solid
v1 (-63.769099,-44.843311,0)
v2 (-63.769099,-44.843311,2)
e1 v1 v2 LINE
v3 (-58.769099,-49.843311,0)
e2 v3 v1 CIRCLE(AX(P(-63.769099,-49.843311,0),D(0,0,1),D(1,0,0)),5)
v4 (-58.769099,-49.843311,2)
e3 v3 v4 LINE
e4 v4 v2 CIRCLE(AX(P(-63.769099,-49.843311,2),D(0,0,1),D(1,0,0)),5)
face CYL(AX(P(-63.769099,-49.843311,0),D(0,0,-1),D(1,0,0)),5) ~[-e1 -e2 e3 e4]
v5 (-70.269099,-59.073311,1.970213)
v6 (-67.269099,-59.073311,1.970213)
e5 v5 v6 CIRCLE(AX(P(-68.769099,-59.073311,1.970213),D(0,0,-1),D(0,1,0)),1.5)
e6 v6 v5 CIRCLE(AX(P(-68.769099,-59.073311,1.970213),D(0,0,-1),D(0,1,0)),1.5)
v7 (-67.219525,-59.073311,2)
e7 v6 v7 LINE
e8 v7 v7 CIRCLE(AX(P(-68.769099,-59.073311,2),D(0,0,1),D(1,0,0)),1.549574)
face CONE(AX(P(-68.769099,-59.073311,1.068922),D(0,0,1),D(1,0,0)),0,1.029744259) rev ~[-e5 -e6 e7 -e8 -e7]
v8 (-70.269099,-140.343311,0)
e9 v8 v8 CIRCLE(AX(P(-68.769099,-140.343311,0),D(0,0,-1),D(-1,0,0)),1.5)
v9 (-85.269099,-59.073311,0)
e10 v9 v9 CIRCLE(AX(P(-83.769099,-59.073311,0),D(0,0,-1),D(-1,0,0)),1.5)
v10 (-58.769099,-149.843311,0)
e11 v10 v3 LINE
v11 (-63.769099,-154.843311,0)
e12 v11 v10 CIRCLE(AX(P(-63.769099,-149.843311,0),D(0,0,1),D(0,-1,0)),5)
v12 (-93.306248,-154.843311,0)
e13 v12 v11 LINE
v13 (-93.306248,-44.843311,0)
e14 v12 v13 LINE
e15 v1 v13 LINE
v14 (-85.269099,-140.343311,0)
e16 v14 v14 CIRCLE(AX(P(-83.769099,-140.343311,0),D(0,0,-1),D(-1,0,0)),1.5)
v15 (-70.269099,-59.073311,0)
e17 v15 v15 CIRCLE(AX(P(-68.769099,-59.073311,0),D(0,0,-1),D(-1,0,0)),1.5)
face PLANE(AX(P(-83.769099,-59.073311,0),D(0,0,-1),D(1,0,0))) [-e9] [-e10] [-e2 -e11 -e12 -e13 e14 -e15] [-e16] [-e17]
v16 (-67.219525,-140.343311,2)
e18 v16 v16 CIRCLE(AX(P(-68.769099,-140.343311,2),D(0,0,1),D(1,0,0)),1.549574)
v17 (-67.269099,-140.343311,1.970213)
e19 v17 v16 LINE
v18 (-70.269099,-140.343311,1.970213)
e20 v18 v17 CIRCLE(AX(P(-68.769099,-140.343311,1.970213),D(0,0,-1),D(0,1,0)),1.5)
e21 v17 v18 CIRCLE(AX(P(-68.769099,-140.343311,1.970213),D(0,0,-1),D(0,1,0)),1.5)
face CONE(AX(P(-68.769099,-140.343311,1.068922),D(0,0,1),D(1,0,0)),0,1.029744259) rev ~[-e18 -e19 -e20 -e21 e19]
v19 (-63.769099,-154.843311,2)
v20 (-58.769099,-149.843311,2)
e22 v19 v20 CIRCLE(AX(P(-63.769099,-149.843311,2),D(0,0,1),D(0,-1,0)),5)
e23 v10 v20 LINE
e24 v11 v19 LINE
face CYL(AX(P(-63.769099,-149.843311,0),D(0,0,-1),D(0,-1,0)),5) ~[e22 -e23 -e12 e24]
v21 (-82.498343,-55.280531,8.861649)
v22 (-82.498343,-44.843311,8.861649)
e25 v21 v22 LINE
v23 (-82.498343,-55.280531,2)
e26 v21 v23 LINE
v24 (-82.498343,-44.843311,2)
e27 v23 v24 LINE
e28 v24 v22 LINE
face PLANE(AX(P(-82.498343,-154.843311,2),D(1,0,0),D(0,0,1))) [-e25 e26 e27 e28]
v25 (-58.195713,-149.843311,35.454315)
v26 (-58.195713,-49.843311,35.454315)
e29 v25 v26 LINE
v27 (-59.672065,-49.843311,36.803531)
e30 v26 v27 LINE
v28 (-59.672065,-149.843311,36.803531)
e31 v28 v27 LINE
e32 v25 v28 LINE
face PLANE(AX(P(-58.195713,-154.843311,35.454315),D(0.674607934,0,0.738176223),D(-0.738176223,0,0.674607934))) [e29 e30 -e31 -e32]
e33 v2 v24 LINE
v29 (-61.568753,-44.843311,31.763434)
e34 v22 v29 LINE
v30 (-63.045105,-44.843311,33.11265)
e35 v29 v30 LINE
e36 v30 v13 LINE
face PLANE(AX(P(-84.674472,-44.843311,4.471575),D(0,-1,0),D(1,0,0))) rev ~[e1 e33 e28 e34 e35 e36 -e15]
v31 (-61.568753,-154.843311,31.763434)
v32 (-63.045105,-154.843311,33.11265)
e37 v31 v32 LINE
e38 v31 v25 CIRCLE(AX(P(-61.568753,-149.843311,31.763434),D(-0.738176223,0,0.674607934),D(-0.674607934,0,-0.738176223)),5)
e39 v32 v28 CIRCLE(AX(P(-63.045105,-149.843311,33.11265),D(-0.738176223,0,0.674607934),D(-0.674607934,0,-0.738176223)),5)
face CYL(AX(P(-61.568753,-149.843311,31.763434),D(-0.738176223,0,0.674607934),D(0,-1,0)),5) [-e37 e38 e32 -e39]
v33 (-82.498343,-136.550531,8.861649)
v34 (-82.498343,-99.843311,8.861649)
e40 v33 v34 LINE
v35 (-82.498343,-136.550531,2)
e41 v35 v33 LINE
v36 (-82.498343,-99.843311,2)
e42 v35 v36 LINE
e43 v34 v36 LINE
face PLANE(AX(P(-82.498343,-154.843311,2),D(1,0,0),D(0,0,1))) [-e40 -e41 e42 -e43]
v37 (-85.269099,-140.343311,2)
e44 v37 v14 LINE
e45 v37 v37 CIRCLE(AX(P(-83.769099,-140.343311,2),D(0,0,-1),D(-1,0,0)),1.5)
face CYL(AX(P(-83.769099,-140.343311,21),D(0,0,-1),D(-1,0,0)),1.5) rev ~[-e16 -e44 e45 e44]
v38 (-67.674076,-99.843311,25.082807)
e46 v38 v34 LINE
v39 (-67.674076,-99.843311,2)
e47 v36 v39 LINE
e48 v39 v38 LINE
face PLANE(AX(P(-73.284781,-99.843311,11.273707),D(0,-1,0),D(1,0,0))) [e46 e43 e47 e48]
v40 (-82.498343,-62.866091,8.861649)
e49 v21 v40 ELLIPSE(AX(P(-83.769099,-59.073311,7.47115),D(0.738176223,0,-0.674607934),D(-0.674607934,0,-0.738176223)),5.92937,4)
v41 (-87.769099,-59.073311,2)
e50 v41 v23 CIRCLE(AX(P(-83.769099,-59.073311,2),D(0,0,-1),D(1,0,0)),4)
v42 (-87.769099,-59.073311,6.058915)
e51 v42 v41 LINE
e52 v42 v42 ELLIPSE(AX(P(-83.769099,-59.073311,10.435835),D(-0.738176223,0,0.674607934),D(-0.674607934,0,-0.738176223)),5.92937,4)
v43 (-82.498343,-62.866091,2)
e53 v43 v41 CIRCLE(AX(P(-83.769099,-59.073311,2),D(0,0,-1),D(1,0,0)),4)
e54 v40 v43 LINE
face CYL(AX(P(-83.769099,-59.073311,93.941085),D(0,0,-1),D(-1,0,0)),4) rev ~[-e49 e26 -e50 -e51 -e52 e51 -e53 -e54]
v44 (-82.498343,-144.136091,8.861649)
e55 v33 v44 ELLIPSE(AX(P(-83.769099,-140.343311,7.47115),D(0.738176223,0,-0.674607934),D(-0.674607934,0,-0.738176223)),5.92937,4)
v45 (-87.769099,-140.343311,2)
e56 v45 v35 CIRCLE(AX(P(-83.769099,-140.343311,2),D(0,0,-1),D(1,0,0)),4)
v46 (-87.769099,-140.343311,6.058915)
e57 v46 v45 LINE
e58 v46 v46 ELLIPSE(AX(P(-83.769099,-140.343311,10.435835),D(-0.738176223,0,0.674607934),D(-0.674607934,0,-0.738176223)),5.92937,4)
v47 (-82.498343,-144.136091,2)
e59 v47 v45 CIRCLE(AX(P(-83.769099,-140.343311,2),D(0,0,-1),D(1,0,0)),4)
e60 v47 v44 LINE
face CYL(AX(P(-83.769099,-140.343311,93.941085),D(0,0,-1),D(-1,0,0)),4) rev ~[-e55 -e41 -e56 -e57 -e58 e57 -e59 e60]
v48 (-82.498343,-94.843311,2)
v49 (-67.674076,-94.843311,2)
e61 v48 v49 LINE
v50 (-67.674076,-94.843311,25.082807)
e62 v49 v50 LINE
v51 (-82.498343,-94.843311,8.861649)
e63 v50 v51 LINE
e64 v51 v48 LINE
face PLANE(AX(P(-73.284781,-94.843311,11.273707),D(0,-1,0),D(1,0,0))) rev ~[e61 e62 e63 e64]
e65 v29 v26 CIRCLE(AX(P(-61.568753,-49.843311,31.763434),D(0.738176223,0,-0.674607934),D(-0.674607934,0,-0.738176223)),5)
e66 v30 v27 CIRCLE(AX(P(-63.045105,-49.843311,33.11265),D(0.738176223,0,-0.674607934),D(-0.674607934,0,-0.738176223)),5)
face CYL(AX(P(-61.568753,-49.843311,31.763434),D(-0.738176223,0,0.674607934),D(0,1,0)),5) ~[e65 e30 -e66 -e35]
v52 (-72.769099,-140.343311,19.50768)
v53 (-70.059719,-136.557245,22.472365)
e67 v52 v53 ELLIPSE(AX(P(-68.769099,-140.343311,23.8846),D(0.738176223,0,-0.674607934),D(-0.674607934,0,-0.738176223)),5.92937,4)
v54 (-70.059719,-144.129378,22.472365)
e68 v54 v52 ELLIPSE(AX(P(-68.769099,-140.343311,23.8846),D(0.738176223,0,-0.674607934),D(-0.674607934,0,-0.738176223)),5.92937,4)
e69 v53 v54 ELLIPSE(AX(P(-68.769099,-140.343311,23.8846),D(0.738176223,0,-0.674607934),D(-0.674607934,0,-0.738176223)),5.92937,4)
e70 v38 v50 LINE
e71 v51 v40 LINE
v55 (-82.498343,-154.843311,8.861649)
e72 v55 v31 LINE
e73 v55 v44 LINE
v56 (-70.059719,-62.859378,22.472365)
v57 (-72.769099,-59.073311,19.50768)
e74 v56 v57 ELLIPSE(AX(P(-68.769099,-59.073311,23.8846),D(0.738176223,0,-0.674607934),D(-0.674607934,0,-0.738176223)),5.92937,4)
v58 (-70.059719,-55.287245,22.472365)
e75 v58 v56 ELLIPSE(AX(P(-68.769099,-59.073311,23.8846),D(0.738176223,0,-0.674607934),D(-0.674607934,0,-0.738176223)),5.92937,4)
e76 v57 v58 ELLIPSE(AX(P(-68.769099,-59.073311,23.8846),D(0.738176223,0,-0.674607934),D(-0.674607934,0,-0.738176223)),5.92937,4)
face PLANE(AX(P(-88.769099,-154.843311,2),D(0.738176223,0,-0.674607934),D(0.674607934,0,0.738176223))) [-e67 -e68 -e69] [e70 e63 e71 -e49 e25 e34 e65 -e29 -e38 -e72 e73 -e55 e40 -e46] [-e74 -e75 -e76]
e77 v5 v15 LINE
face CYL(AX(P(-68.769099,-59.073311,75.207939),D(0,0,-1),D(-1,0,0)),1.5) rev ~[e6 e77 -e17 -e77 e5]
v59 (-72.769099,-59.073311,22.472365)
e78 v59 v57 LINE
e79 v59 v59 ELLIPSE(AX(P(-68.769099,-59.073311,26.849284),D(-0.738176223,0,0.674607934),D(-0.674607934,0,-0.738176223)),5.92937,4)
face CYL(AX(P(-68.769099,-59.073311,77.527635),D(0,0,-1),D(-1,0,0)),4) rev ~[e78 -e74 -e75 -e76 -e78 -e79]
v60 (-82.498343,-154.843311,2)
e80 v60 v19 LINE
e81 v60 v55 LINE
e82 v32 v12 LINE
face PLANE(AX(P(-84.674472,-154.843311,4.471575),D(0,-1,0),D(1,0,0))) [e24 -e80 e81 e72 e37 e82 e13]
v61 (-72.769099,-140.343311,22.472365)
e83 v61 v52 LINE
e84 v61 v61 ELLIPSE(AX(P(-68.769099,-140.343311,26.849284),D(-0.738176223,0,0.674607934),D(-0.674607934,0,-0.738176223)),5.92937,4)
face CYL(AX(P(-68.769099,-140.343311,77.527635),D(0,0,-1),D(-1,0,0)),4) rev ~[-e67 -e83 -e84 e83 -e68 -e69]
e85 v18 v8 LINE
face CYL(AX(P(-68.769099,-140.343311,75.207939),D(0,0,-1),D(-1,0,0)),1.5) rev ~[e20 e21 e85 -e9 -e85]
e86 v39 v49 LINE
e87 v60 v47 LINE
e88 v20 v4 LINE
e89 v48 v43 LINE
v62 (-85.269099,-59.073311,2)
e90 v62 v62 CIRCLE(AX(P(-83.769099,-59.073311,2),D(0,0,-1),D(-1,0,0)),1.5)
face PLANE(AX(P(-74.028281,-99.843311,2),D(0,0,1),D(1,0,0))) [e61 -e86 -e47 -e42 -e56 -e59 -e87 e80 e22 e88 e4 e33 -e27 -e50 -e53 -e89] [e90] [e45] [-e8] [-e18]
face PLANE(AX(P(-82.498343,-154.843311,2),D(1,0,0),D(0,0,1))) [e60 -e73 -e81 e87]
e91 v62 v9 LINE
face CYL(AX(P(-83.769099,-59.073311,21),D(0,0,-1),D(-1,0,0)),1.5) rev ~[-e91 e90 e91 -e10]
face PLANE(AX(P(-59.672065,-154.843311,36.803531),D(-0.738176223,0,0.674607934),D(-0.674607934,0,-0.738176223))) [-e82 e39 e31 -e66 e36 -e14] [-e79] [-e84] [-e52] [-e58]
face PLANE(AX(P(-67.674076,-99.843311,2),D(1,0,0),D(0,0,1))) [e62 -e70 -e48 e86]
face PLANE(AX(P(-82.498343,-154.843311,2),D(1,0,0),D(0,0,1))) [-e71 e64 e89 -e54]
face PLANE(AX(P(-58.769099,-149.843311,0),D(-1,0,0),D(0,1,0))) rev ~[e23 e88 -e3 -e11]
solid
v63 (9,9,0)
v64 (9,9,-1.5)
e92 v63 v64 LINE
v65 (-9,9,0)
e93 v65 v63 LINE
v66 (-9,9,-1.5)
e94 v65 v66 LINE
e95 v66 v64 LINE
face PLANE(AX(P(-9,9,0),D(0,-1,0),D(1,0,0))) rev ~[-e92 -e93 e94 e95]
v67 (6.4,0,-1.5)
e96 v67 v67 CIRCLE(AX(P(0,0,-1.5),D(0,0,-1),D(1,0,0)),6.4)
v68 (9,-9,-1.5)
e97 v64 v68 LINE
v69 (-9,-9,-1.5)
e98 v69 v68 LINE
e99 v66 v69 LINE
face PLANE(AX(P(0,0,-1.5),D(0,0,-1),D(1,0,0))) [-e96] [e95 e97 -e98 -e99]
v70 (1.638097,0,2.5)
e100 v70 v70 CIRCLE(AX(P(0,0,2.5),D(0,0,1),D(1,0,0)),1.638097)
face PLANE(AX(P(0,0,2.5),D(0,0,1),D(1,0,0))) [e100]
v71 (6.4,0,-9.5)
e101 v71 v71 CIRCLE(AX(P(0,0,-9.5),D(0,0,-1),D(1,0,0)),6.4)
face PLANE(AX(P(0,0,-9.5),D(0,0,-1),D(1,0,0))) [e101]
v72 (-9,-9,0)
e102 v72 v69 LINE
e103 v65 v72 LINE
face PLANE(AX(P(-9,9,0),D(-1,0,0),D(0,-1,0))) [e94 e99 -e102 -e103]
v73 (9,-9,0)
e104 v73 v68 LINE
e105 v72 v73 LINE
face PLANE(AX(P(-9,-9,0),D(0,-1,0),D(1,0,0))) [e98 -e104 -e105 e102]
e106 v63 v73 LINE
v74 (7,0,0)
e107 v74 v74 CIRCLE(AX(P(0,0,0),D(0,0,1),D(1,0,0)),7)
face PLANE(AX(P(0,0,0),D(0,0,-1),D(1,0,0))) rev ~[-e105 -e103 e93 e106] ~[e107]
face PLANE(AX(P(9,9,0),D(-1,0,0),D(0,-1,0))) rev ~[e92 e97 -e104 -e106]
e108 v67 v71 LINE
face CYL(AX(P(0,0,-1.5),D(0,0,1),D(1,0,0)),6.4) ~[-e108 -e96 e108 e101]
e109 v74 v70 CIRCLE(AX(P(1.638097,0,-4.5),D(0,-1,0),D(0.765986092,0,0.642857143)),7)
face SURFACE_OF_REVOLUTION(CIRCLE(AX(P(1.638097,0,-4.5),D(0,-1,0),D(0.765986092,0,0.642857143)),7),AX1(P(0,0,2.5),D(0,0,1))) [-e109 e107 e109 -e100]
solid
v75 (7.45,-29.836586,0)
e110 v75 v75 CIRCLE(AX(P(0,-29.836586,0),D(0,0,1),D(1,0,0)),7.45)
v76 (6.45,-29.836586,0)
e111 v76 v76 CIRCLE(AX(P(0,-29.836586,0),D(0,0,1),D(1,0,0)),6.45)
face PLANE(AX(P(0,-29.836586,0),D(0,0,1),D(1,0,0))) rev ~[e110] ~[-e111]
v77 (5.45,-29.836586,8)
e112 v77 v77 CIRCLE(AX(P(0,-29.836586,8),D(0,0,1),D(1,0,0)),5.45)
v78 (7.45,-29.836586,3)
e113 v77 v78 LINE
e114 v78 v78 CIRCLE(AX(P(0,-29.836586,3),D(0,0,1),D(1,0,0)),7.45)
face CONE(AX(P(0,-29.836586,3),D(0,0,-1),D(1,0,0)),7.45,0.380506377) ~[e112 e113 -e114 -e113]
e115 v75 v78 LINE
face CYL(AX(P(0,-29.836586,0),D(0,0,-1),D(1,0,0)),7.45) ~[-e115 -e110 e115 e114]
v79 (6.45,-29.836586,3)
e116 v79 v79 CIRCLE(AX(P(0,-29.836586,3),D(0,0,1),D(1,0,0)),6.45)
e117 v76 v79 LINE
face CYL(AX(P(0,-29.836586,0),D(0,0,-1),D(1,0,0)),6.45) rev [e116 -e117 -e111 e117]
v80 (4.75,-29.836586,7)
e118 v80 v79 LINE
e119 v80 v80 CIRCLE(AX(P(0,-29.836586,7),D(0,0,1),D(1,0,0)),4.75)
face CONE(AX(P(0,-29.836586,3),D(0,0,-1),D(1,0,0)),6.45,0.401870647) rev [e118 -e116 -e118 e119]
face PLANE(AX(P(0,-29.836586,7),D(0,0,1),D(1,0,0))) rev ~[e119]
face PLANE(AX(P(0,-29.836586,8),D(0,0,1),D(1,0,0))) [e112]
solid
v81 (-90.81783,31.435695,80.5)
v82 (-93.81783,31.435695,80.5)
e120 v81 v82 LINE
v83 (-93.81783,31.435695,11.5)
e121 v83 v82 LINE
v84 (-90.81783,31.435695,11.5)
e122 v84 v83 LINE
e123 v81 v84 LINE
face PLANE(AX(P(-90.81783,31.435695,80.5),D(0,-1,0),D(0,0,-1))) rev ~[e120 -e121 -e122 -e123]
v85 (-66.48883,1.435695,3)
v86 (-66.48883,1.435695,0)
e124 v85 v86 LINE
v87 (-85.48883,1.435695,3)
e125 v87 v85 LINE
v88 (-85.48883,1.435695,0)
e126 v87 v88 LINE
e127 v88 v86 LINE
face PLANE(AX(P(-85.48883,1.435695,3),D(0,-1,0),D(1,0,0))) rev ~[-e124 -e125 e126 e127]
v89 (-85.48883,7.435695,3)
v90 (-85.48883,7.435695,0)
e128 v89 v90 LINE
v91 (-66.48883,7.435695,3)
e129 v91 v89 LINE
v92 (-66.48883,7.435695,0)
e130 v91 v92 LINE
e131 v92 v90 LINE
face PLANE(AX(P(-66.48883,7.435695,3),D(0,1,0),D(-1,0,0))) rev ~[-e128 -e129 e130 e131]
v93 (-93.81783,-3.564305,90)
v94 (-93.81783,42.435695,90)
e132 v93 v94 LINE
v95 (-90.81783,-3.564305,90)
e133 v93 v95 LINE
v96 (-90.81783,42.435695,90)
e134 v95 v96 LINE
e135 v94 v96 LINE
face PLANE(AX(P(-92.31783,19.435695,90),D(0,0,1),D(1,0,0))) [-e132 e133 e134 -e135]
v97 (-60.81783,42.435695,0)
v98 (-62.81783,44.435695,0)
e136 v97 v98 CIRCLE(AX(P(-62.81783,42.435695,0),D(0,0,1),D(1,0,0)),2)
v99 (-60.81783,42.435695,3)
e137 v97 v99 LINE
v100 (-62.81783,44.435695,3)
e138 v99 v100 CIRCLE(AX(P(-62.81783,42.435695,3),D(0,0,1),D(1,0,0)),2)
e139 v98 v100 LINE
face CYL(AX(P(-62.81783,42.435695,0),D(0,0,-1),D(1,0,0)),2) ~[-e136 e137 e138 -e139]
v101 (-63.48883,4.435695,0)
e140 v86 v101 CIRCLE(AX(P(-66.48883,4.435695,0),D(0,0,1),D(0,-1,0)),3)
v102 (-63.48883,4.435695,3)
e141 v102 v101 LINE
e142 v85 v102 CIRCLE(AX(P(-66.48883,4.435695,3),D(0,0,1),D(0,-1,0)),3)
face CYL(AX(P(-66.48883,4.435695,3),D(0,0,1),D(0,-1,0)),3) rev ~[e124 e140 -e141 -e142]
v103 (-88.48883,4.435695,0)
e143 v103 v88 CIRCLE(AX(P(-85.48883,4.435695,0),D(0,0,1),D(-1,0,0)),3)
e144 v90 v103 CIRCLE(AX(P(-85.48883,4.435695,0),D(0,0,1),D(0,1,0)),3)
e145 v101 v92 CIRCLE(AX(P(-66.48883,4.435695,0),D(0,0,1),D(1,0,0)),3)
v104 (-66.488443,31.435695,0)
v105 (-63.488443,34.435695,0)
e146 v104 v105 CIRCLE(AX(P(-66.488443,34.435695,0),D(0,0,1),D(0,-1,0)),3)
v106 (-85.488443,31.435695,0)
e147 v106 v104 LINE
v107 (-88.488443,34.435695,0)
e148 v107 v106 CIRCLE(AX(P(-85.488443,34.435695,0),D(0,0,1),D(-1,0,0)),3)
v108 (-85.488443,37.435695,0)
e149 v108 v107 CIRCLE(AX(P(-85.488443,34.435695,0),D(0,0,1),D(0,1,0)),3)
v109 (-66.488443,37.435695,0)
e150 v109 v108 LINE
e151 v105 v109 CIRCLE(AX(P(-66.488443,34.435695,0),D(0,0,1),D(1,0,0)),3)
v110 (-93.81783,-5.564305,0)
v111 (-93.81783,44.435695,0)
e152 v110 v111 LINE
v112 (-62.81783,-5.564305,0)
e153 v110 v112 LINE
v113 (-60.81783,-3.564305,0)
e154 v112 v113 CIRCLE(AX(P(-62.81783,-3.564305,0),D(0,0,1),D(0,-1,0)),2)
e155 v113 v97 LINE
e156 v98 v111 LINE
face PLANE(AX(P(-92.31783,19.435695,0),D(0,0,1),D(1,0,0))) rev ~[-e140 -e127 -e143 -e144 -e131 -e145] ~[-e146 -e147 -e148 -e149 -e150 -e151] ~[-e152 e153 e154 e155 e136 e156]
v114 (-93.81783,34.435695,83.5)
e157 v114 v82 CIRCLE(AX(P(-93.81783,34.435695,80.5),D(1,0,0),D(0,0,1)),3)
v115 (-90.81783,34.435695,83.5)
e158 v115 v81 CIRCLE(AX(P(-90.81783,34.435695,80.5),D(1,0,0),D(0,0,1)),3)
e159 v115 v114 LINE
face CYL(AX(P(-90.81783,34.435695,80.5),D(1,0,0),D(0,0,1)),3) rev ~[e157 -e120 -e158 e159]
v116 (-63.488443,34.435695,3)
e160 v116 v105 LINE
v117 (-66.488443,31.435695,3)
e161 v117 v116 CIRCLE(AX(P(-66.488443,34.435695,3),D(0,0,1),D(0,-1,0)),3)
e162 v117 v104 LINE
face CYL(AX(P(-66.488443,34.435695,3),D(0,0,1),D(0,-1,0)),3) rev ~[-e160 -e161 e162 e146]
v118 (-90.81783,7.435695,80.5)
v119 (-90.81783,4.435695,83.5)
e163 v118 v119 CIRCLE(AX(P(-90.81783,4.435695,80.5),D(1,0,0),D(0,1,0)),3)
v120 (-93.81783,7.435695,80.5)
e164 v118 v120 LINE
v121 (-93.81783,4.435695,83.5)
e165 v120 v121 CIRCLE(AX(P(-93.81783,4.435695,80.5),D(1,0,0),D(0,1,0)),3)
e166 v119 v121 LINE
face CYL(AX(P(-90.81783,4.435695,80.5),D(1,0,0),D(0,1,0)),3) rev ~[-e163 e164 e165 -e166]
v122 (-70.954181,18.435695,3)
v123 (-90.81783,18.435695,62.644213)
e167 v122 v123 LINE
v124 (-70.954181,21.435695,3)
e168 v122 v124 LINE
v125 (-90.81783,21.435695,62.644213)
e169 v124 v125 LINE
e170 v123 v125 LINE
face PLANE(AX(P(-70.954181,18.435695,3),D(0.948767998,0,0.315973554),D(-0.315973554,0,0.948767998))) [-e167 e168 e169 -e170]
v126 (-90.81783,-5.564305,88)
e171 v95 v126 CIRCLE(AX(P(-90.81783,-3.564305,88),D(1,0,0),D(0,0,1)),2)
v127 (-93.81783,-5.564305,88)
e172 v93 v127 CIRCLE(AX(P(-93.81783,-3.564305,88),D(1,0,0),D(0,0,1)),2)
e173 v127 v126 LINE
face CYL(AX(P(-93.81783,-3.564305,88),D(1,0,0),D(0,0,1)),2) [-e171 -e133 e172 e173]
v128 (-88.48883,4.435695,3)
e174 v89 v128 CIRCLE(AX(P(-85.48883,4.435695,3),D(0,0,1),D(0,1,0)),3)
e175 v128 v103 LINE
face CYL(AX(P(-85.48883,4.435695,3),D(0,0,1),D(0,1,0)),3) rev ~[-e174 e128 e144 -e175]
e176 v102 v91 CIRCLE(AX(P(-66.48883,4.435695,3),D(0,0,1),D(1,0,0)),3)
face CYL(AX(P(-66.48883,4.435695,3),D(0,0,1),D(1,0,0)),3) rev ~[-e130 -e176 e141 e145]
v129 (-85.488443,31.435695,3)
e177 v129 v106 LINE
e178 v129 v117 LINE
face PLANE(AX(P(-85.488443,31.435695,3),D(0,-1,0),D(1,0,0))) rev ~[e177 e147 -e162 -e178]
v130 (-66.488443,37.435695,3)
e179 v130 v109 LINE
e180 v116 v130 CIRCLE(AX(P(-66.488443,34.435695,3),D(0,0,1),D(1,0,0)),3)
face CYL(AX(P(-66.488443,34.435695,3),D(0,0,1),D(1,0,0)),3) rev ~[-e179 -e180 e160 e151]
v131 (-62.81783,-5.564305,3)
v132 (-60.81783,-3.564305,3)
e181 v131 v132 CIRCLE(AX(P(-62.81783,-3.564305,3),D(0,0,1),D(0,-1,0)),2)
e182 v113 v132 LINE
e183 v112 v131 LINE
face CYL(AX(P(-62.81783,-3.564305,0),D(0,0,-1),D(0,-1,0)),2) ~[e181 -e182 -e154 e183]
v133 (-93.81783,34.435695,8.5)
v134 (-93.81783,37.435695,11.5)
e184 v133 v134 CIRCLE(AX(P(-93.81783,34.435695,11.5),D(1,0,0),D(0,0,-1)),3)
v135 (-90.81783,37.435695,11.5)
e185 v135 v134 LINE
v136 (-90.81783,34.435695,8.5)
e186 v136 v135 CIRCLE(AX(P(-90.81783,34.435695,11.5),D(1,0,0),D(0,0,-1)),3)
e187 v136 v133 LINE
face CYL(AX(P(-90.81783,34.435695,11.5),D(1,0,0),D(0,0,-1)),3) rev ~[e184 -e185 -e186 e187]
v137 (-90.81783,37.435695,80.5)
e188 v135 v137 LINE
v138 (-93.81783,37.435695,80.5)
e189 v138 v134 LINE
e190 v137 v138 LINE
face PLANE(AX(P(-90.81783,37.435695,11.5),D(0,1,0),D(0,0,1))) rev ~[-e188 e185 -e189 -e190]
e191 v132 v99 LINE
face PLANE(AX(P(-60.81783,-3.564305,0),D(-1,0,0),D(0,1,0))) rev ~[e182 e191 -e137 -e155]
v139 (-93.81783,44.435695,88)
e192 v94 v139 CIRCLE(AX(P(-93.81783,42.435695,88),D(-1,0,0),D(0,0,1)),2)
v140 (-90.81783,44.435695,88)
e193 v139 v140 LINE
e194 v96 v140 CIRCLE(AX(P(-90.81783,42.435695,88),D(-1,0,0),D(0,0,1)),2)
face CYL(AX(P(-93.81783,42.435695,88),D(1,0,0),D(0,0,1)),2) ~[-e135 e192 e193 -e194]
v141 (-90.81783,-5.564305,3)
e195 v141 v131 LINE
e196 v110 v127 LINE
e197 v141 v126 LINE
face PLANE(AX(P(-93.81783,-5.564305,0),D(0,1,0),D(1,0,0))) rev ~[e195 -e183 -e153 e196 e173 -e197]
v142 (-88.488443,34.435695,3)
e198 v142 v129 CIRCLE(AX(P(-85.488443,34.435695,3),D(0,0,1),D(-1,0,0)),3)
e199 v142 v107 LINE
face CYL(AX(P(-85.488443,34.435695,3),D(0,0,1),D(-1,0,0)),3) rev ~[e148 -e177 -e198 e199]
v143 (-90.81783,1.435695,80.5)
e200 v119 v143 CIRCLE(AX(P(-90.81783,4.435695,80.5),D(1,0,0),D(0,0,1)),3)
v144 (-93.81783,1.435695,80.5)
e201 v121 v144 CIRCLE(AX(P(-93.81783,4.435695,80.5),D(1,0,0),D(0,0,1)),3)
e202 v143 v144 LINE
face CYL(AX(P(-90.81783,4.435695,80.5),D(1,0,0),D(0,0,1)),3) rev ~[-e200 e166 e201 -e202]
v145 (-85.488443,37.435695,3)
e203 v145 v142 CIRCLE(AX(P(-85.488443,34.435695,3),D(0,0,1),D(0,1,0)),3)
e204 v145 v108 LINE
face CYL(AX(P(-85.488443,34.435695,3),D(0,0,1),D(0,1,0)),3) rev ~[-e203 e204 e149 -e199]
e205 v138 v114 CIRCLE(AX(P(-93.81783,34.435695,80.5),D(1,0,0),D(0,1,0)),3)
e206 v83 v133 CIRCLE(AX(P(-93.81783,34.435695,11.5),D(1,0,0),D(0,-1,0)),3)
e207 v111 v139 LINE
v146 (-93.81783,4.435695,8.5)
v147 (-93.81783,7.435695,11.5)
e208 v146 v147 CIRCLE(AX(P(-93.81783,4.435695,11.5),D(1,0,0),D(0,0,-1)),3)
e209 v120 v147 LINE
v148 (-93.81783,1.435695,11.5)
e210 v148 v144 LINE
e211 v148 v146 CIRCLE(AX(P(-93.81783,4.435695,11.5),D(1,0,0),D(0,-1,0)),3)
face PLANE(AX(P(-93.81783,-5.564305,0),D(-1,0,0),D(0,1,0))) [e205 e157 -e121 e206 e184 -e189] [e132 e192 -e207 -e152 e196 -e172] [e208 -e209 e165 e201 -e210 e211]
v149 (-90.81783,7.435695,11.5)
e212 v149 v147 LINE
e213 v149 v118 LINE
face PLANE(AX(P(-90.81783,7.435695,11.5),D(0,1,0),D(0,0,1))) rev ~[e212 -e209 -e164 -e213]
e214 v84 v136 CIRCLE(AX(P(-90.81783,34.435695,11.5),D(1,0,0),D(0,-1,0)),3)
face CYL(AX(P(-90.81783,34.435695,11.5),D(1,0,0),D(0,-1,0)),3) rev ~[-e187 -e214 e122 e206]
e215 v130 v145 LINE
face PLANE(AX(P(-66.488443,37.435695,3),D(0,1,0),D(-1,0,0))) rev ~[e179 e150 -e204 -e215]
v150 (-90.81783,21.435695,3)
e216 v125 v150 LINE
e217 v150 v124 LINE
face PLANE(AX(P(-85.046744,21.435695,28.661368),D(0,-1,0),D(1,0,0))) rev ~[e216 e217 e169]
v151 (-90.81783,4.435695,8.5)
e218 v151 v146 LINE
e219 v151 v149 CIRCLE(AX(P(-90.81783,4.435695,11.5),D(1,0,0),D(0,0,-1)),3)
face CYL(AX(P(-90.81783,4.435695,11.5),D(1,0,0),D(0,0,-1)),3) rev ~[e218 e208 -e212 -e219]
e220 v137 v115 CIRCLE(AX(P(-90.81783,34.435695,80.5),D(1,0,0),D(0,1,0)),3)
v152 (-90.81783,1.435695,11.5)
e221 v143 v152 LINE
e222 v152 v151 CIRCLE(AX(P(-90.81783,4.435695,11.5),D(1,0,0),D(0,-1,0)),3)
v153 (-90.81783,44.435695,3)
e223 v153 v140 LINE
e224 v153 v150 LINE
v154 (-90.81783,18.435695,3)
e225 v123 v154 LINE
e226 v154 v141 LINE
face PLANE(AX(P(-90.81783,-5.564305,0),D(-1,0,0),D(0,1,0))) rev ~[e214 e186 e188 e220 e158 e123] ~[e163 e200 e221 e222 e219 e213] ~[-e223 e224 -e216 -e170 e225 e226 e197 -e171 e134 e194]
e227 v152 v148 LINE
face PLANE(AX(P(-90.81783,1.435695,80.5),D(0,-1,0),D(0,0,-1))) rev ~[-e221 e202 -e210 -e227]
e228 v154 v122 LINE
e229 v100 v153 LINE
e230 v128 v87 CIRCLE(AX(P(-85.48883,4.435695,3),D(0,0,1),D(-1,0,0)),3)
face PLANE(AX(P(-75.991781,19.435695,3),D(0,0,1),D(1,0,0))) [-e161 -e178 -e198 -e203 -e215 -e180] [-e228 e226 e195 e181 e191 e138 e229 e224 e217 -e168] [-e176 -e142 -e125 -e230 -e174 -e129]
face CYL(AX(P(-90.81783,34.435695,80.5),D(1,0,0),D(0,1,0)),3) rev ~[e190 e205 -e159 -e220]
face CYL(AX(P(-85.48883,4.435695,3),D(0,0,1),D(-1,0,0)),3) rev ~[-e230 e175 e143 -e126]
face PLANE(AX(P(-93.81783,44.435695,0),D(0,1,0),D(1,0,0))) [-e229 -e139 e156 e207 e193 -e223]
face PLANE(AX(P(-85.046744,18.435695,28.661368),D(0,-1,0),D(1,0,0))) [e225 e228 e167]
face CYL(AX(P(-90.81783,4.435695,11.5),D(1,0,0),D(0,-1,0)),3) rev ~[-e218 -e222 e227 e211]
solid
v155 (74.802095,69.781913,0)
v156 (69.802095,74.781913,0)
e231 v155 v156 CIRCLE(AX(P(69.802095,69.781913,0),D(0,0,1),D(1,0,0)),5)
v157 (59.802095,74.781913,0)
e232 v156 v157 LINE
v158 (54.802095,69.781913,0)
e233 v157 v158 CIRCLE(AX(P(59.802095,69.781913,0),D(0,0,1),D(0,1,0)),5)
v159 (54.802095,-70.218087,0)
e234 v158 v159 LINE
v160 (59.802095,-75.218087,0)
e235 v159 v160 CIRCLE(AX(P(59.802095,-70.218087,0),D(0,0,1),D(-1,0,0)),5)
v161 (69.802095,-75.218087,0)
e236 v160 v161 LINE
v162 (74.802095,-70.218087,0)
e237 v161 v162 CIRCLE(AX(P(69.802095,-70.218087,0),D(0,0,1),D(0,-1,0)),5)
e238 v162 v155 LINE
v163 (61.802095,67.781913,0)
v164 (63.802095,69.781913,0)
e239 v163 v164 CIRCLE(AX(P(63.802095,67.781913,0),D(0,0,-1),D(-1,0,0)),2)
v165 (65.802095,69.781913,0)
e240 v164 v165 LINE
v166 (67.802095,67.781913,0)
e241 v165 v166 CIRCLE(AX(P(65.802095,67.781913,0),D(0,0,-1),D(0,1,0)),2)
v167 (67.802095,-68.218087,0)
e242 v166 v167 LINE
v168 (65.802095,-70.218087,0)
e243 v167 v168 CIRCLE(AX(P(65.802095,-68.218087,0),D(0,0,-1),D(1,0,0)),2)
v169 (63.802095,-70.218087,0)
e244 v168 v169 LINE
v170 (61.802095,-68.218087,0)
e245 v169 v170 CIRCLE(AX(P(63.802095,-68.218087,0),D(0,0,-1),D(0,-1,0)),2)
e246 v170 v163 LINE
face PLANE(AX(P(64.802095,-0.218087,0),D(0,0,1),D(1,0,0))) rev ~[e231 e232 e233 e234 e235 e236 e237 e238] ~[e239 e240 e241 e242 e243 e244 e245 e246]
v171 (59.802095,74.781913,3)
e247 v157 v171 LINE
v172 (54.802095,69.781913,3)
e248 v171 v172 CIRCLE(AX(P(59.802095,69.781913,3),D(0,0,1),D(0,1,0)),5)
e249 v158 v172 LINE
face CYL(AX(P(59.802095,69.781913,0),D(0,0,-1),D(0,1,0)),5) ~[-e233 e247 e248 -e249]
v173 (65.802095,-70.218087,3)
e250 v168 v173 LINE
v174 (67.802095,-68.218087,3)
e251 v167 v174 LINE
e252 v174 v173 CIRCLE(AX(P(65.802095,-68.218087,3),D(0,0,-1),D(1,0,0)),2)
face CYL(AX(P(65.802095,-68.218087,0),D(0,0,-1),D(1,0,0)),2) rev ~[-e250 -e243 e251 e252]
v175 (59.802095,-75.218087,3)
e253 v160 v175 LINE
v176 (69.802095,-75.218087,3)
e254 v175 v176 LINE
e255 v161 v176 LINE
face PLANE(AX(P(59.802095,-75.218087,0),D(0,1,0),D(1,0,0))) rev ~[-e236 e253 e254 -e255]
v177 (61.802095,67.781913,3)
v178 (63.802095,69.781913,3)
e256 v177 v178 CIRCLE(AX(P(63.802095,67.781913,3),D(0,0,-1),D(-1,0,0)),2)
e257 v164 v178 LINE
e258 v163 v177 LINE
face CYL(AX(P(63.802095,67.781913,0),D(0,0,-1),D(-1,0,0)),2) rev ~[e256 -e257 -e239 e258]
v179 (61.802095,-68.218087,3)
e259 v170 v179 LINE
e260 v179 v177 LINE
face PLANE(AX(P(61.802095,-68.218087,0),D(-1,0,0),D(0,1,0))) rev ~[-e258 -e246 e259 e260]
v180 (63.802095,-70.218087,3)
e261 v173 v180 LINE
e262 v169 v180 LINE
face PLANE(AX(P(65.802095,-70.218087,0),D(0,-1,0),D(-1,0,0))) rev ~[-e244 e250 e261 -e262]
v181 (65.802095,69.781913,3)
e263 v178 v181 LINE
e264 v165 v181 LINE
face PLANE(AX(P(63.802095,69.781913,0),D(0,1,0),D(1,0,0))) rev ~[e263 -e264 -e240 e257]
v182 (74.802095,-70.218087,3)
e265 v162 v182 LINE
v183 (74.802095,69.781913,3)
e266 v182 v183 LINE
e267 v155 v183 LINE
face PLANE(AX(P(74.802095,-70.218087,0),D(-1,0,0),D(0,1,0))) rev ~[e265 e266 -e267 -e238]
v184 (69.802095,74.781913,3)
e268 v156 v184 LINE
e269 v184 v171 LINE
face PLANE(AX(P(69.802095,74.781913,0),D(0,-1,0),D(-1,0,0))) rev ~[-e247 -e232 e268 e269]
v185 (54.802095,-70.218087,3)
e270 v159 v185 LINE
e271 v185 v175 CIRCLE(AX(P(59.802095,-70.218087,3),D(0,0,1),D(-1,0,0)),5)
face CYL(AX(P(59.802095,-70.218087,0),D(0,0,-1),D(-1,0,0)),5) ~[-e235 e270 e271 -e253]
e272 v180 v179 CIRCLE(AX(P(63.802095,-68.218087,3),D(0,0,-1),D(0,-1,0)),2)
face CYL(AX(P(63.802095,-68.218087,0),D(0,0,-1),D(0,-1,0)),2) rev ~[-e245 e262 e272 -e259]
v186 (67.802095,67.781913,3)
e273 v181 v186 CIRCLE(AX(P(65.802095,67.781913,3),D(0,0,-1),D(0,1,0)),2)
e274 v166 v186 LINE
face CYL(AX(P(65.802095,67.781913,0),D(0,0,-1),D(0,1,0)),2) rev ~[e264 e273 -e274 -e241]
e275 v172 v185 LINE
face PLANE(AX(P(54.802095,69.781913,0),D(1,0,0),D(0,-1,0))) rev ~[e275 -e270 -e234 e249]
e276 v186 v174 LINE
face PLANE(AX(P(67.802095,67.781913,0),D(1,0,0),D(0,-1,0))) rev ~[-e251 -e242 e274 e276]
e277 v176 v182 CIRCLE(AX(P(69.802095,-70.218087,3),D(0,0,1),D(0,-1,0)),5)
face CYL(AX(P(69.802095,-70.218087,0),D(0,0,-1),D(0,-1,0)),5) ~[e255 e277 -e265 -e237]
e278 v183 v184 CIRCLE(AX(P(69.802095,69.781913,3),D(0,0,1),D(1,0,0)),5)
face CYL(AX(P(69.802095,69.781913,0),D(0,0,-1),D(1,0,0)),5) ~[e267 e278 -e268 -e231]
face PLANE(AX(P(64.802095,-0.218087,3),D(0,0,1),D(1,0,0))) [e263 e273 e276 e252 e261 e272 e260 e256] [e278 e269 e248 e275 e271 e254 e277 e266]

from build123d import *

# Parameters (mm, degrees)
F0_R        = 7
F1_DEPTH    = 2.5
F4_W        = 18
F4_H        = 18
F5_DEPTH    = 1.5
F7_R        = 6.4
F8_DEPTH    = 8
F9_R        = 7.45
F10_DEPTH   = 8
F11_SIZE2   = 5
F11_SIZE    = 2
F12_R       = 6.45
F13_DEPTH   = 7
F14_SIZE2   = 4
F14_SIZE    = 1.7
F17_DEPTH   = 3
F19_DEPTH   = 3
F20_W       = 3
F20_H       = 50
F21_DEPTH   = 90
F22_R       = 2
F24_DEPTH   = 25
F26_DEPTH   = 25
F29_DEPTH   = 3
F31_DEPTH   = 2
F33_DEPTH   = 110
F34_R       = 5
F36_DEPTH   = 110
F39_D       = 3
F39_DEPTH   = 50
F39_START   = 24.7920605
F39_START_2 = 41.2055101
F39_TIP     = 0.9012909285
F41_D       = 8
F41_DEPTH   = 19
F41_START   = 27.5276354
F41_START_2 = 43.9410851
F41_TIP     = 2.4034424761
F42_R       = 4
F43_DEPTH   = 2
F45_D       = 3
F45_DEPTH   = 19
F45_TIP     = 0.9012909285
F48_DEPTH   = 5


# Not quite as in the source:
# - a fillet or chamfer that OpenCascade refuses, or shapes differently, is made with other operations: its cross-section is extruded or revolved along the edge and cut away or added


with BuildPart() as f1:
    # F0 (on Top) → F1 (new body)
    with BuildSketch(Plane.XY):
        Circle(F0_R)
    extrude(amount=F1_DEPTH)

    # F2: fillet of radius 7 on 1 edges, made by hand

    # F2_s1 → F2_t2 (revolve, cut)
    with BuildSketch(Plane.XZ):
        with BuildLine():
            ThreePointArc((7, 0), (4.5961372442, 1.8442887702), (1.6380973526, 2.5))
            Line((1.6380973526, 2.5), (7, 2.5))
            Line((7, 2.5), (7, 0))
        make_face()
    revolve(axis=Axis((0, 0, 2.5), (0, 0, 1)), mode=Mode.SUBTRACT)

    # F4 (on offset) → F5 (join)
    with BuildSketch(Plane(origin=(0, 0, 0), x_dir=(1, 0, 0), z_dir=(0, 0, -1))):
        Rectangle(F4_W, F4_H)
    extrude(amount=F5_DEPTH)

    # F7 (on offset) → F8 (join)
    with BuildSketch(Plane(origin=(0, 0, -1.5), x_dir=(1, 0, 0), z_dir=(0, 0, -1))):
        Circle(F7_R)
    extrude(amount=F8_DEPTH)


with BuildPart() as f10:
    # F9 (on Top) → F10 (new body)
    with BuildSketch(Plane.XY):
        with Locations((0, -29.8365864904)):
            Circle(F9_R)
    extrude(amount=F10_DEPTH)

    # F11
    f11_edges = [f10.edges().sort_by_distance(p)[0] for p in [
        (-7.45, -29.836586, 8),
    ]]
    f11_side = f10.faces().sort_by_distance((0, -29.836586, 8))[0]
    chamfer(f11_edges, length=F11_SIZE, length2=F11_SIZE2, reference=f11_side)


with BuildPart() as f13:
    # F12 (on Top) → F13 (new body)
    with BuildSketch(Plane.XY):
        with Locations((0, -29.8365864904)):
            Circle(F12_R)
    extrude(amount=F13_DEPTH)

    # F14
    f14_edges = [f13.edges().sort_by_distance(p)[0] for p in [
        (-6.45, -29.836586, 7),
    ]]
    f14_side = f13.faces().sort_by_distance((0, -29.836586, 7))[0]
    chamfer(f14_edges, length=F14_SIZE, length2=F14_SIZE2, reference=f14_side)


with BuildPart() as f10_1:
    add(f10.part)

    # F15: cut F13
    add(f13.part, mode=Mode.SUBTRACT)


with BuildPart() as f17:
    # F16 (on Top) → F17 (new body)
    with BuildSketch(Plane.XY):
        with BuildLine():
            Line((69.802095294, 74.7819127334), (59.802095294, 74.7819127334))
            ThreePointArc((59.802095294, 74.7819127334), (56.2665613881, 73.3174466393), (54.802095294, 69.7819127334))
            Line((54.802095294, 69.7819127334), (54.802095294, -70.2180872666))
            ThreePointArc((54.802095294, -70.2180872666), (56.2665613881, -73.7536211725), (59.802095294, -75.2180872666))
            Line((59.802095294, -75.2180872666), (69.802095294, -75.2180872666))
            ThreePointArc((69.802095294, -75.2180872666), (73.3376291999, -73.7536211725), (74.802095294, -70.2180872666))
            Line((74.802095294, -70.2180872666), (74.802095294, 69.7819127334))
            ThreePointArc((74.802095294, 69.7819127334), (73.3376291999, 73.3174466393), (69.802095294, 74.7819127334))
        make_face()
        with BuildLine():
            ThreePointArc((61.802095294, 67.7819127334), (62.3878817316, 69.1961262958), (63.802095294, 69.7819127334))
            Line((63.802095294, 69.7819127334), (65.802095294, 69.7819127334))
            ThreePointArc((65.802095294, 69.7819127334), (67.2163088564, 69.1961262958), (67.802095294, 67.7819127334))
            Line((67.802095294, 67.7819127334), (67.802095294, -68.2180872666))
            ThreePointArc((67.802095294, -68.2180872666), (67.2163088564, -69.632300829), (65.802095294, -70.2180872666))
            Line((65.802095294, -70.2180872666), (63.802095294, -70.2180872666))
            ThreePointArc((63.802095294, -70.2180872666), (62.3878817316, -69.632300829), (61.802095294, -68.2180872666))
            Line((61.802095294, -68.2180872666), (61.802095294, 67.7819127334))
        make_face(mode=Mode.SUBTRACT)
    extrude(amount=F17_DEPTH)


with BuildPart() as f19:
    # F18 (on Top) → F19 (new body)
    with BuildSketch(Plane.XY):
        with BuildLine():
            Line((-62.8178298175, 44.4356946539), (-90.8178298175, 44.4356946539))
            Line((-90.8178298175, 44.4356946539), (-90.8178298175, -5.5643053461))
            Line((-90.8178298175, -5.5643053461), (-62.8178298175, -5.5643053461))
            ThreePointArc((-62.8178298175, -5.5643053461), (-61.4036162552, -4.9785189084), (-60.8178298175, -3.5643053461))
            Line((-60.8178298175, -3.5643053461), (-60.8178298175, 42.4356946539))
            ThreePointArc((-60.8178298175, 42.4356946539), (-61.4036162552, 43.8499082163), (-62.8178298175, 44.4356946539))
        make_face()
    extrude(amount=F19_DEPTH)

    # F20 (on Top) → F21 (join)
    with BuildSketch(Plane.XY):
        with Locations((-92.3178298175, 19.4356946539)):
            Rectangle(F20_W, F20_H)
    extrude(amount=F21_DEPTH)

    # F22
    f22_edges = [f19.edges().sort_by_distance(p)[0] for p in [
        (-92.31783, -5.564305, 90),
        (-92.31783, 44.435695, 90),
    ]]
    fillet(f22_edges, radius=F22_R)

    # F23 (on face) → F24 (cut)
    with BuildSketch(Plane.XY.offset(3)):
        with BuildLine():
            Line((-66.4884431298, 37.4356946539), (-85.4884431298, 37.4356946539))
            ThreePointArc((-85.4884431298, 37.4356946539), (-87.6097634734, 36.5570149975), (-88.4884431298, 34.4356946539))
            ThreePointArc((-88.4884431298, 34.4356946539), (-87.6097634734, 32.3143743104), (-85.4884431298, 31.4356946539))
            Line((-85.4884431298, 31.4356946539), (-66.4884431298, 31.4356946539))
            ThreePointArc((-66.4884431298, 31.4356946539), (-64.3671227862, 32.3143743104), (-63.4884431298, 34.4356946539))
            ThreePointArc((-63.4884431298, 34.4356946539), (-64.3671227862, 36.5570149975), (-66.4884431298, 37.4356946539))
        make_face()
        with BuildLine():
            Line((-66.4888298175, 7.4356946539), (-85.4888298175, 7.4356946539))
            ThreePointArc((-85.4888298175, 7.4356946539), (-87.6101501611, 6.5570149975), (-88.4888298175, 4.4356946539))
            ThreePointArc((-88.4888298175, 4.4356946539), (-87.6101501611, 2.3143743104), (-85.4888298175, 1.4356946539))
            Line((-85.4888298175, 1.4356946539), (-66.4888298175, 1.4356946539))
            ThreePointArc((-66.4888298175, 1.4356946539), (-64.367509474, 2.3143743104), (-63.4888298175, 4.4356946539))
            ThreePointArc((-63.4888298175, 4.4356946539), (-64.367509474, 6.5570149975), (-66.4888298175, 7.4356946539))
        make_face()
    extrude(amount=-F24_DEPTH, mode=Mode.SUBTRACT)

    # F25 (on face) → F26 (cut)
    with BuildSketch(Plane.YZ.offset(-90.8178298175)):
        with BuildLine():
            ThreePointArc((34.4356946539, 83.5), (32.3143743104, 82.6213203436), (31.4356946539, 80.5))
            Line((31.4356946539, 80.5), (31.4356946539, 11.5))
            ThreePointArc((31.4356946539, 11.5), (32.3143743104, 9.3786796564), (34.4356946539, 8.5))
            ThreePointArc((34.4356946539, 8.5), (36.5570149975, 9.3786796564), (37.4356946539, 11.5))
            Line((37.4356946539, 11.5), (37.4356946539, 80.5))
            ThreePointArc((37.4356946539, 80.5), (36.5570149975, 82.6213203436), (34.4356946539, 83.5))
        make_face()
        with BuildLine():
            ThreePointArc((4.4356946539, 83.5), (2.3143743104, 82.6213203436), (1.4356946539, 80.5))
            Line((1.4356946539, 80.5), (1.4356946539, 11.5))
            ThreePointArc((1.4356946539, 11.5), (2.3143743104, 9.3786796564), (4.4356946539, 8.5))
            ThreePointArc((4.4356946539, 8.5), (6.5570149975, 9.3786796564), (7.4356946539, 11.5))
            Line((7.4356946539, 11.5), (7.4356946539, 80.5))
            ThreePointArc((7.4356946539, 80.5), (6.5570149975, 82.6213203436), (4.4356946539, 83.5))
        make_face()
    extrude(amount=-F26_DEPTH, mode=Mode.SUBTRACT)

    # F28 (on face) → F29 (join)
    with BuildSketch(Plane.XZ.offset(-18.4356946539)):
        Polygon((-70.9541812539, 3), (-90.8178298175, 62.644213438), (-90.8178298175, 3), align=None)
    extrude(amount=-F29_DEPTH)


with BuildPart() as f31:
    # F30 (on Top) → F31 (new body)
    with BuildSketch(Plane.XY):
        with BuildLine():
            Line((-63.7690989673, -44.8433111385), (-88.7690989673, -44.8433111385))
            Line((-88.7690989673, -44.8433111385), (-88.7690989673, -154.8433111385))
            Line((-88.7690989673, -154.8433111385), (-63.7690989673, -154.8433111385))
            ThreePointArc((-63.7690989673, -154.8433111385), (-60.2335650614, -153.3788450445), (-58.7690989673, -149.8433111385))
            Line((-58.7690989673, -149.8433111385), (-58.7690989673, -49.8433111385))
            ThreePointArc((-58.7690989673, -49.8433111385), (-60.2335650614, -46.3077772326), (-63.7690989673, -44.8433111385))
        make_face()
    extrude(amount=F31_DEPTH)

    # F32 (on face) → F33 (join)
    with BuildSketch(Plane.XZ.offset(154.8433111385)):
        Polygon((-88.7690989673, 0), (-88.7690989673, 2), (-58.195712996, 35.4543153755), (-59.6720654413, 36.803531243), (-93.3062484509, 0), align=None)
    extrude(amount=-F33_DEPTH)

    # F34
    f34_edges = [f31.edges().sort_by_distance(p)[0] for p in [
        (-58.933889, -154.843311, 36.128923),
        (-58.933889, -44.843311, 36.128923),
    ]]
    fillet(f34_edges, radius=F34_R)

    # F35 (on face) → F36 (join)
    with BuildSketch(Plane.XZ.offset(154.8433111385)):
        Polygon((-82.4983428217, 8.8616493422), (-88.7690989673, 2), (-82.4983428217, 2), align=None)
    extrude(amount=-F36_DEPTH)

    # F39
    # its depths count from where the whole tool has entered the part; down to there all is cleared
    with Locations(Plane.XY.offset(50)):
        with Locations((-83.7690989673, -140.3433111385, -F39_START_2), (-68.7690989673, -140.3433111385, -F39_START), (-83.7690989673, -59.0733111385, -F39_START_2), (-68.7690989673, -59.0733111385, -F39_START)):
            Hole(F39_D / 2, depth=F39_DEPTH)
            with Locations((0, 0, -(F39_DEPTH + F39_TIP / 2))):  # 118° drill point
                Cone(0, F39_D / 2, F39_TIP, mode=Mode.SUBTRACT)

    # F41
    # its depths count from where the whole tool has entered the part; down to there all is cleared
    with Locations(Plane.XY.offset(50)):
        with Locations((-68.7690989673, -140.3433111385), (-68.7690989673, -59.0733111385)):
            Hole(F41_D / 2, depth=F41_START)
    with Locations(Plane.XY.offset(50)):
        with Locations((-83.7690989673, -140.3433111385), (-83.7690989673, -59.0733111385)):
            Hole(F41_D / 2, depth=F41_START_2)
    with Locations(Plane.XY.offset(50)):
        with Locations((-83.7690989673, -140.3433111385, -F41_START_2), (-68.7690989673, -140.3433111385, -F41_START), (-68.7690989673, -59.0733111385, -F41_START), (-83.7690989673, -59.0733111385, -F41_START_2)):
            Hole(F41_D / 2, depth=F41_DEPTH)
            with Locations((0, 0, -(F41_DEPTH + F41_TIP / 2))):  # 118° drill point
                Cone(0, F41_D / 2, F41_TIP, mode=Mode.SUBTRACT)

    # F42 (on face) → F43 (join)
    with BuildSketch(Plane(origin=(0, 0, 0), x_dir=(1, 0, 0), z_dir=(0, 0, -1))):
        with Locations((-83.7690989673, 59.0733111385)):
            Circle(F42_R)
        with Locations((-83.7690989673, 140.3433111385)):
            Circle(F42_R)
    extrude(amount=-F43_DEPTH)

    # F45
    with Locations(Plane.XY.offset(2)):
        with Locations((-83.7690989673, -59.0733111385), (-83.7690989673, -140.3433111385)):
            Hole(F45_D / 2, depth=F45_DEPTH)
            with Locations((0, 0, -(F45_DEPTH + F45_TIP / 2))):  # 118° drill point
                Cone(0, F45_D / 2, F45_TIP, mode=Mode.SUBTRACT)

    # F47 (on offset) → F48 (join)
    with BuildSketch(Plane.XZ.offset(99.8433111385)):
        Polygon((-82.4983428217, 2), (-67.6740757078, 2), (-67.6740757078, 25.0828067796), (-82.4983428217, 8.8616493422), align=None)
    extrude(amount=-F48_DEPTH)


solid = Compound([f1.part, f10_1.part, f17.part, f19.part, f31.part])
